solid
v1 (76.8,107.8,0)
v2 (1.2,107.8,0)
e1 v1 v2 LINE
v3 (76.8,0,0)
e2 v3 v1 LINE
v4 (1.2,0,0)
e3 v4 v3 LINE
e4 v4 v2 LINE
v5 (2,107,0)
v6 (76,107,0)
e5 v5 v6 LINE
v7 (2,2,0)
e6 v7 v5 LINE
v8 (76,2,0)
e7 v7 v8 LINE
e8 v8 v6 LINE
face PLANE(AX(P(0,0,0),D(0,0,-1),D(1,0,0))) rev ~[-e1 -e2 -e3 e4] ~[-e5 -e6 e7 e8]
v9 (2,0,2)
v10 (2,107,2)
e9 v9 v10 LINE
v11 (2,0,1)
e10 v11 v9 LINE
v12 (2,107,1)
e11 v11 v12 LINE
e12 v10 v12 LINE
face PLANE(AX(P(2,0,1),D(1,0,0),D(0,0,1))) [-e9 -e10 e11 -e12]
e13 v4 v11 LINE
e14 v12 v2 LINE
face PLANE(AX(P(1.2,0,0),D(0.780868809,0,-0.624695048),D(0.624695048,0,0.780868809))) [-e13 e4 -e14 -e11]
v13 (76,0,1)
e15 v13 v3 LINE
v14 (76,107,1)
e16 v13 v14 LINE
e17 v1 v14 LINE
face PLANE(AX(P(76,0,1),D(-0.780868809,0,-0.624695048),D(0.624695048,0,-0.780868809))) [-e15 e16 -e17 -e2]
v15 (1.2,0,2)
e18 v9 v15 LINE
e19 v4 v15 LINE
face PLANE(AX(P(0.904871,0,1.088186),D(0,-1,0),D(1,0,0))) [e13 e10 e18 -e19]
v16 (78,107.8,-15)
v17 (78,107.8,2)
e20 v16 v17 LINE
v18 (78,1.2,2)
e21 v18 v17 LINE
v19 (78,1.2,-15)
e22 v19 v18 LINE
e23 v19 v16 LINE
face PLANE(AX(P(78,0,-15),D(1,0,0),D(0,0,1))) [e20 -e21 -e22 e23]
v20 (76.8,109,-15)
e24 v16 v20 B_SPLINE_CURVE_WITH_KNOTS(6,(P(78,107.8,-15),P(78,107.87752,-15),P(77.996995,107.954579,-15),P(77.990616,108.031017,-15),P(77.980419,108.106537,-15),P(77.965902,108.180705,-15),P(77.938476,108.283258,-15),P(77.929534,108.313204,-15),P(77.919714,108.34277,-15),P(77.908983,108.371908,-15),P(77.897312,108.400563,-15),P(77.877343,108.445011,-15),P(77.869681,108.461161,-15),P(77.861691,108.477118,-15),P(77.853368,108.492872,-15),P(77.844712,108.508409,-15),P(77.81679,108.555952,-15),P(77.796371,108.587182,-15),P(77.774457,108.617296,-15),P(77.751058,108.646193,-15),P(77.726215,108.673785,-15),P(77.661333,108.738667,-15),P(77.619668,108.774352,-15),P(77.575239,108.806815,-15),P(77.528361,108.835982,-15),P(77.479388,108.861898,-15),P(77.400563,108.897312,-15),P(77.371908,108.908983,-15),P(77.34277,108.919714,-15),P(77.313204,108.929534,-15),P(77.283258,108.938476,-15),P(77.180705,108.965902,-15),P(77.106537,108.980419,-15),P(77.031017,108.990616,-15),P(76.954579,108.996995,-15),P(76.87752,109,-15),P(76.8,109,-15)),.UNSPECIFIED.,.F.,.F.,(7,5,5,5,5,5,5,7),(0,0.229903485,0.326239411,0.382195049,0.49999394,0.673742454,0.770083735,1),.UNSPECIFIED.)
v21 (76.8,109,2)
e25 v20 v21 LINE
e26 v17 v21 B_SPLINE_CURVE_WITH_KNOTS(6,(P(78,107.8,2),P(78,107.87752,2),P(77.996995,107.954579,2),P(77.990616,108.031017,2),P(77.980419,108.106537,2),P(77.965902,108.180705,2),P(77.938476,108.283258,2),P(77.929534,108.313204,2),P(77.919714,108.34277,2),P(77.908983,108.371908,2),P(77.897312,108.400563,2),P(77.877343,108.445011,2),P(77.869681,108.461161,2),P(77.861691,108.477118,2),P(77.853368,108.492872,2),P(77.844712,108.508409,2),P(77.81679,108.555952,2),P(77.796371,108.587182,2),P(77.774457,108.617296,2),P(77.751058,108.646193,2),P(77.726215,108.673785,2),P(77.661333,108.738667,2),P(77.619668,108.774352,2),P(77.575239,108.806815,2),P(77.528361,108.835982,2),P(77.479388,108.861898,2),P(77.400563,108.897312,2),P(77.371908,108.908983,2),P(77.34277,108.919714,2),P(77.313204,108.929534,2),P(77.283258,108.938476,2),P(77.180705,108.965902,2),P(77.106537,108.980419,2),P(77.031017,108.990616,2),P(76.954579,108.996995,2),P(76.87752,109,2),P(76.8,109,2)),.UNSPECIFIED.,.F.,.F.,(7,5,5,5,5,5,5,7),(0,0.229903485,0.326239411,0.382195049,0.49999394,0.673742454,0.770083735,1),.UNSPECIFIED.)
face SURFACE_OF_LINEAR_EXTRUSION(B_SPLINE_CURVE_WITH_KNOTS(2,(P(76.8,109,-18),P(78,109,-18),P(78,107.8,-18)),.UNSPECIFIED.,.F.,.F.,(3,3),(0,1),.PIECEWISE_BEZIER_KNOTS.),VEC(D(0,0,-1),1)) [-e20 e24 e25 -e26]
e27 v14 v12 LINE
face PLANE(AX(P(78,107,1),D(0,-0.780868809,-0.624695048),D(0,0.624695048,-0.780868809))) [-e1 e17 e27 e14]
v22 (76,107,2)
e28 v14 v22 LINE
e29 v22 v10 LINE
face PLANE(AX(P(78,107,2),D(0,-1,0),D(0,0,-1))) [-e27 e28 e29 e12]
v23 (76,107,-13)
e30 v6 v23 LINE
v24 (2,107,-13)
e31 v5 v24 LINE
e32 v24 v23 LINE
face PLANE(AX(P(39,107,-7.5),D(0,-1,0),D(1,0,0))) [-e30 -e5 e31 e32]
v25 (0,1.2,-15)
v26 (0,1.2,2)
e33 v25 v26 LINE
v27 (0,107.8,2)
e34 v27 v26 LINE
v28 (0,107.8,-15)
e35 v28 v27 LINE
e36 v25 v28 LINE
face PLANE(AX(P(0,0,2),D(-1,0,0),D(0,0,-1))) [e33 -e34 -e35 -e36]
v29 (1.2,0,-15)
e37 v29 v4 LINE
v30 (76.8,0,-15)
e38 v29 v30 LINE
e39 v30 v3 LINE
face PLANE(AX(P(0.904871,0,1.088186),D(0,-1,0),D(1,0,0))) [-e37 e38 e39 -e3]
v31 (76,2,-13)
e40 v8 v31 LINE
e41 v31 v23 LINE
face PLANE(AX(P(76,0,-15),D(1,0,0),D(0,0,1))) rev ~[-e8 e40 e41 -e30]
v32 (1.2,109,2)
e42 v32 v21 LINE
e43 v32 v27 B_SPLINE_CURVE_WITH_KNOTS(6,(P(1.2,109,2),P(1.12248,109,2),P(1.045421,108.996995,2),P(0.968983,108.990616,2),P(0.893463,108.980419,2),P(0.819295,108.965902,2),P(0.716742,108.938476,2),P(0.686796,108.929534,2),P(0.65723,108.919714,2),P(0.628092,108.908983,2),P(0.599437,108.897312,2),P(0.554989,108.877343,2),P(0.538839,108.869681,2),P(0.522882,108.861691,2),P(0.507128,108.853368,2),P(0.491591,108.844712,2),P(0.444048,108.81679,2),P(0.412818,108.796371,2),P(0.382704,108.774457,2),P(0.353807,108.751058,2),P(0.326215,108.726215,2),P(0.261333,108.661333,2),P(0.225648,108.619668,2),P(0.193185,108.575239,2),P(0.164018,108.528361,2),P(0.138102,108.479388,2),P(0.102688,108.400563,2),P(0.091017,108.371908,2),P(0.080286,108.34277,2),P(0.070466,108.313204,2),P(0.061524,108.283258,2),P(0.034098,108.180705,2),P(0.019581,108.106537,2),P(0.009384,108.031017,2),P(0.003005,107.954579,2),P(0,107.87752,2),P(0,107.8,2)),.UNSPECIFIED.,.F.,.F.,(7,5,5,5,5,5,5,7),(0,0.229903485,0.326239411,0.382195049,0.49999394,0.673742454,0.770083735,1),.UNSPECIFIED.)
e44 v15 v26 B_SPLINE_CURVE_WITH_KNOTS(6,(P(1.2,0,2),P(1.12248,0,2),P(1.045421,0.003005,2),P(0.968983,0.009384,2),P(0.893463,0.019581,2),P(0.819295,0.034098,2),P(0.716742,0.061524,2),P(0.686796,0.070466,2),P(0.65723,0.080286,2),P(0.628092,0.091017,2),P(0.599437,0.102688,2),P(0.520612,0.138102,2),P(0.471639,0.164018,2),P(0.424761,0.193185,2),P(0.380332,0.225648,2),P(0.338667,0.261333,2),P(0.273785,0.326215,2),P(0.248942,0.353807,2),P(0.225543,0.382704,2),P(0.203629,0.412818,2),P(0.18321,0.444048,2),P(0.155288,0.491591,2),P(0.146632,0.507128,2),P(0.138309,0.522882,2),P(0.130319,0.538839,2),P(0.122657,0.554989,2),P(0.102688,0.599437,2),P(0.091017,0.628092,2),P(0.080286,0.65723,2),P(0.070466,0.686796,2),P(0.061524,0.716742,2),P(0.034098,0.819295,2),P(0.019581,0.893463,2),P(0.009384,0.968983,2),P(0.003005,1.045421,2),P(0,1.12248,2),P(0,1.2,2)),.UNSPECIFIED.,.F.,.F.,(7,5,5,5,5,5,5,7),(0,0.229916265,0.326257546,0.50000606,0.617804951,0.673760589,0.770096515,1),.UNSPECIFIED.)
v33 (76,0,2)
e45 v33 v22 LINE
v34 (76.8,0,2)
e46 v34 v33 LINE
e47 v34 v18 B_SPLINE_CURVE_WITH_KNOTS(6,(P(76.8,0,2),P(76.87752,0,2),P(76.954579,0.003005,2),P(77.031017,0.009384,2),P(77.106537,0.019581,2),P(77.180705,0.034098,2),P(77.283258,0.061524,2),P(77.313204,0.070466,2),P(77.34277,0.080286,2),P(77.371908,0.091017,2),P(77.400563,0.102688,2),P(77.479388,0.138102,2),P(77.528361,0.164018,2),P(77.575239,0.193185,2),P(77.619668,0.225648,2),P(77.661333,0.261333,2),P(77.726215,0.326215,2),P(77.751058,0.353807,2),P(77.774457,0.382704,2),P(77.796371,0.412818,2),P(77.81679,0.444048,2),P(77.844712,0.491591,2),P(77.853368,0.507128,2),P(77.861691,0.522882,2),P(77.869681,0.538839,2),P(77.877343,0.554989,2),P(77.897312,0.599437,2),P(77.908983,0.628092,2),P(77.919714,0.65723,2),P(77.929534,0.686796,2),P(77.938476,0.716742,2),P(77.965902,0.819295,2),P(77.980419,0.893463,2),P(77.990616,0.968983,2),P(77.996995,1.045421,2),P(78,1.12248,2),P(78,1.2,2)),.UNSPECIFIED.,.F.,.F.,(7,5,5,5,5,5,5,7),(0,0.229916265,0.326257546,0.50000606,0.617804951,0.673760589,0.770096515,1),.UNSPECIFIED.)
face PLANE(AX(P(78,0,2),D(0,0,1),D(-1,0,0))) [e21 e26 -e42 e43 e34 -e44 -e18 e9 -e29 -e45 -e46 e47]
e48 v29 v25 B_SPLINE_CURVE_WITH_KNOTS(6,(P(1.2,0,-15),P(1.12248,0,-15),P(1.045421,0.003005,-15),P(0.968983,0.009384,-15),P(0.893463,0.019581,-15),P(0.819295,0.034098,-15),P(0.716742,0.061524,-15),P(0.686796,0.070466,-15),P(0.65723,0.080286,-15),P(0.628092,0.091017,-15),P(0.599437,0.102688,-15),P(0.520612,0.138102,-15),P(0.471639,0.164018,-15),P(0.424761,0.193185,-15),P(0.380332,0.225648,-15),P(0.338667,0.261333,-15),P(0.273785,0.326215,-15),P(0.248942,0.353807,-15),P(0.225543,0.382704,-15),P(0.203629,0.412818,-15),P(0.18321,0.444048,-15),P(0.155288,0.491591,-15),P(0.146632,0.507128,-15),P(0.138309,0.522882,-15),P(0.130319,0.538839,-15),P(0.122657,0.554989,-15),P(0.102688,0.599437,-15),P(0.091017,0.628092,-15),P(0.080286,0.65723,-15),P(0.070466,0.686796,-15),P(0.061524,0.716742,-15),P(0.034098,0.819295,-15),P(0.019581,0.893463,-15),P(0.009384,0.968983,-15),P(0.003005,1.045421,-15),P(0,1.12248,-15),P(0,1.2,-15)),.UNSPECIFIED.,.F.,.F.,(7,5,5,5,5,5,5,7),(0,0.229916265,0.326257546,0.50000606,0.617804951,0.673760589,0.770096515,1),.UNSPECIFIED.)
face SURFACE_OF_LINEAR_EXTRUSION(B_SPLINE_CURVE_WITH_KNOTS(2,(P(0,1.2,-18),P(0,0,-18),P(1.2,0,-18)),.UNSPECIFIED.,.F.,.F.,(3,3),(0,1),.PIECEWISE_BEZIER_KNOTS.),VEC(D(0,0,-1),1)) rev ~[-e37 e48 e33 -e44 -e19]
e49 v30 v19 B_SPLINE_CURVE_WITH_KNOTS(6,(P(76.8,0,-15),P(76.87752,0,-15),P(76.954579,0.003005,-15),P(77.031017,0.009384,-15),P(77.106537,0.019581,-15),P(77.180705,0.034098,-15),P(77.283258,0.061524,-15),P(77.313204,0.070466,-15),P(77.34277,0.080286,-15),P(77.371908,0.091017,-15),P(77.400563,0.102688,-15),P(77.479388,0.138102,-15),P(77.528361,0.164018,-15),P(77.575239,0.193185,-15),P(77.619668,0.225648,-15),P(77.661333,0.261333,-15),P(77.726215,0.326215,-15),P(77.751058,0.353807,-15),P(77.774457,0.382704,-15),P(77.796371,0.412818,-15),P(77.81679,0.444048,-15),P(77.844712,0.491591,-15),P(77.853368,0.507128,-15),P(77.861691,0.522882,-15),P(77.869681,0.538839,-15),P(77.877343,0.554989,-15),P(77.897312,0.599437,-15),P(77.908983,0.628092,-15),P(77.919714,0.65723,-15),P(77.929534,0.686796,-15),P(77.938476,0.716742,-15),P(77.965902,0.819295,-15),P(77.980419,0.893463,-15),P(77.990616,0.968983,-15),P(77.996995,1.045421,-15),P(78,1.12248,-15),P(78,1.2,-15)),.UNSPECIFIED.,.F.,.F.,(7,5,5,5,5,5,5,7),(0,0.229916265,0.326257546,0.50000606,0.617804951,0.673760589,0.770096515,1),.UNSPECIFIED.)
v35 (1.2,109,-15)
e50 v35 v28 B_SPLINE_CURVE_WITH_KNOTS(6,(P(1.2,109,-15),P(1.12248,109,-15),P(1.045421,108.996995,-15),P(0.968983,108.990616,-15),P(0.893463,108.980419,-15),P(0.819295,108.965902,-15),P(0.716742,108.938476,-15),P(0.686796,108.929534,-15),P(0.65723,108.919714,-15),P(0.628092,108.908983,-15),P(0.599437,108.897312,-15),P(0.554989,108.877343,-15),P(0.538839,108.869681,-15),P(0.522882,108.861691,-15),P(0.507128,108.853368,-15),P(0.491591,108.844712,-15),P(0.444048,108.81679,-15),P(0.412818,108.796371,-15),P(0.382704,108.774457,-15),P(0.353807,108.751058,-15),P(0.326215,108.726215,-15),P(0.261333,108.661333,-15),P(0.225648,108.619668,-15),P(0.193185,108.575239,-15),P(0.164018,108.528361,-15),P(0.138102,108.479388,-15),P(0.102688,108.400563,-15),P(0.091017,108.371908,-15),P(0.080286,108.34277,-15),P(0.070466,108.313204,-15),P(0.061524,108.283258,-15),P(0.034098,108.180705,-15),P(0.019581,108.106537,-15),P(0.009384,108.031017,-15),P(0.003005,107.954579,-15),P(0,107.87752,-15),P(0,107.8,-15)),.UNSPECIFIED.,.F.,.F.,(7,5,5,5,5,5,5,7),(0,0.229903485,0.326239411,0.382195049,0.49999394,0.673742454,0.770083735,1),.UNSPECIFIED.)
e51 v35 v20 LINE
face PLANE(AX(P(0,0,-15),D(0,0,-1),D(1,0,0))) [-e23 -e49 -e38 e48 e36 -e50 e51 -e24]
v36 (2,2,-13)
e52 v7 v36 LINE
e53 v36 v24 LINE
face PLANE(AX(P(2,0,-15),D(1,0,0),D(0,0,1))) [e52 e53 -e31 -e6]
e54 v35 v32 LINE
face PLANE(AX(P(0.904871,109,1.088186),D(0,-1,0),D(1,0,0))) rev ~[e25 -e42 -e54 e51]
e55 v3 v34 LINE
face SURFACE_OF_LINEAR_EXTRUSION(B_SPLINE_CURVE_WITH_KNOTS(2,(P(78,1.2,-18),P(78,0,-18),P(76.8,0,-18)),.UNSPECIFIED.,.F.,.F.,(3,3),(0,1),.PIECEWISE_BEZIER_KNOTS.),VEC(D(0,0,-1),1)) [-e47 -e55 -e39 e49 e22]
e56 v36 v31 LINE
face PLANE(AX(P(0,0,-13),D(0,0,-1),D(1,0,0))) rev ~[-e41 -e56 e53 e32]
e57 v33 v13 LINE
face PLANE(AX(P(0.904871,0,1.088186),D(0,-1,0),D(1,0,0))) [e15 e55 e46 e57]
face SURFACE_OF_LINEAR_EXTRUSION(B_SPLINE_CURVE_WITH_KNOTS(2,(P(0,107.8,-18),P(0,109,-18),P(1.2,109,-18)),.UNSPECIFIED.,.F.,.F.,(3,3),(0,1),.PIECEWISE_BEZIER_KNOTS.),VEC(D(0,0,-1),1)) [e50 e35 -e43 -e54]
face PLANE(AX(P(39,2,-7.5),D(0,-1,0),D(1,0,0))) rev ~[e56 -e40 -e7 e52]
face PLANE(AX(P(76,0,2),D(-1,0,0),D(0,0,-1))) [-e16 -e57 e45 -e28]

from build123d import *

# Parameters (mm, degrees)
F0_W        = 78
F0_H        = 15
F1_DEPTH    = 109
F2_T        = -2
F4_DEPTH    = 109
F6_DEPTH    = 78
F7_T1_DEPTH = 23


# Not quite as in the source:
# - a fillet or chamfer that OpenCascade refuses, or shapes differently, is made with other operations: its cross-section is extruded or revolved along the edge and cut away or added


with BuildPart() as f1:
    # F0 (on Front) → F1 (new body)
    with BuildSketch(Plane.XZ):
        with Locations((39, -7.5)):
            Rectangle(F0_W, F0_H)
    extrude(amount=-F1_DEPTH)

    # F2
    f2_openings = [f1.faces().sort_by_distance(p)[0] for p in [
        (39, 54.5, 0),
    ]]
    offset(amount=F2_T, openings=f2_openings)

    # F3 (on face) → F4 (join, through all)
    with BuildSketch(Plane.XZ):
        Polygon((0, 2), (0, 0), (1.2, 0), (2, 1), (2, 2), align=None)
        Polygon((76, 1), (76.8, 0), (78, 0), (78, 2), (76, 2), align=None)
    extrude(amount=-F4_DEPTH)

    # F5 (on face) → F6 (join, through all)
    with BuildSketch(Plane.YZ.offset(78)):
        Polygon((109, 0), (109, 2), (107, 2), (107, 1), (107.8, 0), align=None)
    extrude(amount=-F6_DEPTH)

    # F7: fillet of radius 1.2 on 4 edges, made by hand

    # F7_s2 → F7_t1 (cut)
    with BuildSketch(Plane.XY.offset(-18)):
        with BuildLine():
            add(Edge.make_bspline(
                [(78, 1.2), (78, 0), (76.8, 0)],
                knots=[0, 0, 0, 1, 1, 1], degree=2, weights=[1, 1, 1]))
            Line((76.8, 0), (78, 0))
            Line((78, 0), (78, 1.2))
        make_face()
        with BuildLine():
            add(Edge.make_bspline(
                [(76.8, 109), (78, 109), (78, 107.8)],
                knots=[0, 0, 0, 1, 1, 1], degree=2, weights=[1, 1, 1]))
            Line((78, 107.8), (78, 109))
            Line((78, 109), (76.8, 109))
        make_face()
        with BuildLine():
            add(Edge.make_bspline(
                [(0, 107.8), (0, 109), (1.2, 109)],
                knots=[0, 0, 0, 1, 1, 1], degree=2, weights=[1, 1, 1]))
            Line((1.2, 109), (0, 109))
            Line((0, 109), (0, 107.8))
        make_face()
        with BuildLine():
            add(Edge.make_bspline(
                [(0, 1.2), (0, 0), (1.2, 0)],
                knots=[0, 0, 0, 1, 1, 1], degree=2, weights=[1, 1, 1]))
            Line((1.2, 0), (0, 0))
            Line((0, 0), (0, 1.2))
        make_face()
    extrude(amount=F7_T1_DEPTH, mode=Mode.SUBTRACT)


solid = f1.part
